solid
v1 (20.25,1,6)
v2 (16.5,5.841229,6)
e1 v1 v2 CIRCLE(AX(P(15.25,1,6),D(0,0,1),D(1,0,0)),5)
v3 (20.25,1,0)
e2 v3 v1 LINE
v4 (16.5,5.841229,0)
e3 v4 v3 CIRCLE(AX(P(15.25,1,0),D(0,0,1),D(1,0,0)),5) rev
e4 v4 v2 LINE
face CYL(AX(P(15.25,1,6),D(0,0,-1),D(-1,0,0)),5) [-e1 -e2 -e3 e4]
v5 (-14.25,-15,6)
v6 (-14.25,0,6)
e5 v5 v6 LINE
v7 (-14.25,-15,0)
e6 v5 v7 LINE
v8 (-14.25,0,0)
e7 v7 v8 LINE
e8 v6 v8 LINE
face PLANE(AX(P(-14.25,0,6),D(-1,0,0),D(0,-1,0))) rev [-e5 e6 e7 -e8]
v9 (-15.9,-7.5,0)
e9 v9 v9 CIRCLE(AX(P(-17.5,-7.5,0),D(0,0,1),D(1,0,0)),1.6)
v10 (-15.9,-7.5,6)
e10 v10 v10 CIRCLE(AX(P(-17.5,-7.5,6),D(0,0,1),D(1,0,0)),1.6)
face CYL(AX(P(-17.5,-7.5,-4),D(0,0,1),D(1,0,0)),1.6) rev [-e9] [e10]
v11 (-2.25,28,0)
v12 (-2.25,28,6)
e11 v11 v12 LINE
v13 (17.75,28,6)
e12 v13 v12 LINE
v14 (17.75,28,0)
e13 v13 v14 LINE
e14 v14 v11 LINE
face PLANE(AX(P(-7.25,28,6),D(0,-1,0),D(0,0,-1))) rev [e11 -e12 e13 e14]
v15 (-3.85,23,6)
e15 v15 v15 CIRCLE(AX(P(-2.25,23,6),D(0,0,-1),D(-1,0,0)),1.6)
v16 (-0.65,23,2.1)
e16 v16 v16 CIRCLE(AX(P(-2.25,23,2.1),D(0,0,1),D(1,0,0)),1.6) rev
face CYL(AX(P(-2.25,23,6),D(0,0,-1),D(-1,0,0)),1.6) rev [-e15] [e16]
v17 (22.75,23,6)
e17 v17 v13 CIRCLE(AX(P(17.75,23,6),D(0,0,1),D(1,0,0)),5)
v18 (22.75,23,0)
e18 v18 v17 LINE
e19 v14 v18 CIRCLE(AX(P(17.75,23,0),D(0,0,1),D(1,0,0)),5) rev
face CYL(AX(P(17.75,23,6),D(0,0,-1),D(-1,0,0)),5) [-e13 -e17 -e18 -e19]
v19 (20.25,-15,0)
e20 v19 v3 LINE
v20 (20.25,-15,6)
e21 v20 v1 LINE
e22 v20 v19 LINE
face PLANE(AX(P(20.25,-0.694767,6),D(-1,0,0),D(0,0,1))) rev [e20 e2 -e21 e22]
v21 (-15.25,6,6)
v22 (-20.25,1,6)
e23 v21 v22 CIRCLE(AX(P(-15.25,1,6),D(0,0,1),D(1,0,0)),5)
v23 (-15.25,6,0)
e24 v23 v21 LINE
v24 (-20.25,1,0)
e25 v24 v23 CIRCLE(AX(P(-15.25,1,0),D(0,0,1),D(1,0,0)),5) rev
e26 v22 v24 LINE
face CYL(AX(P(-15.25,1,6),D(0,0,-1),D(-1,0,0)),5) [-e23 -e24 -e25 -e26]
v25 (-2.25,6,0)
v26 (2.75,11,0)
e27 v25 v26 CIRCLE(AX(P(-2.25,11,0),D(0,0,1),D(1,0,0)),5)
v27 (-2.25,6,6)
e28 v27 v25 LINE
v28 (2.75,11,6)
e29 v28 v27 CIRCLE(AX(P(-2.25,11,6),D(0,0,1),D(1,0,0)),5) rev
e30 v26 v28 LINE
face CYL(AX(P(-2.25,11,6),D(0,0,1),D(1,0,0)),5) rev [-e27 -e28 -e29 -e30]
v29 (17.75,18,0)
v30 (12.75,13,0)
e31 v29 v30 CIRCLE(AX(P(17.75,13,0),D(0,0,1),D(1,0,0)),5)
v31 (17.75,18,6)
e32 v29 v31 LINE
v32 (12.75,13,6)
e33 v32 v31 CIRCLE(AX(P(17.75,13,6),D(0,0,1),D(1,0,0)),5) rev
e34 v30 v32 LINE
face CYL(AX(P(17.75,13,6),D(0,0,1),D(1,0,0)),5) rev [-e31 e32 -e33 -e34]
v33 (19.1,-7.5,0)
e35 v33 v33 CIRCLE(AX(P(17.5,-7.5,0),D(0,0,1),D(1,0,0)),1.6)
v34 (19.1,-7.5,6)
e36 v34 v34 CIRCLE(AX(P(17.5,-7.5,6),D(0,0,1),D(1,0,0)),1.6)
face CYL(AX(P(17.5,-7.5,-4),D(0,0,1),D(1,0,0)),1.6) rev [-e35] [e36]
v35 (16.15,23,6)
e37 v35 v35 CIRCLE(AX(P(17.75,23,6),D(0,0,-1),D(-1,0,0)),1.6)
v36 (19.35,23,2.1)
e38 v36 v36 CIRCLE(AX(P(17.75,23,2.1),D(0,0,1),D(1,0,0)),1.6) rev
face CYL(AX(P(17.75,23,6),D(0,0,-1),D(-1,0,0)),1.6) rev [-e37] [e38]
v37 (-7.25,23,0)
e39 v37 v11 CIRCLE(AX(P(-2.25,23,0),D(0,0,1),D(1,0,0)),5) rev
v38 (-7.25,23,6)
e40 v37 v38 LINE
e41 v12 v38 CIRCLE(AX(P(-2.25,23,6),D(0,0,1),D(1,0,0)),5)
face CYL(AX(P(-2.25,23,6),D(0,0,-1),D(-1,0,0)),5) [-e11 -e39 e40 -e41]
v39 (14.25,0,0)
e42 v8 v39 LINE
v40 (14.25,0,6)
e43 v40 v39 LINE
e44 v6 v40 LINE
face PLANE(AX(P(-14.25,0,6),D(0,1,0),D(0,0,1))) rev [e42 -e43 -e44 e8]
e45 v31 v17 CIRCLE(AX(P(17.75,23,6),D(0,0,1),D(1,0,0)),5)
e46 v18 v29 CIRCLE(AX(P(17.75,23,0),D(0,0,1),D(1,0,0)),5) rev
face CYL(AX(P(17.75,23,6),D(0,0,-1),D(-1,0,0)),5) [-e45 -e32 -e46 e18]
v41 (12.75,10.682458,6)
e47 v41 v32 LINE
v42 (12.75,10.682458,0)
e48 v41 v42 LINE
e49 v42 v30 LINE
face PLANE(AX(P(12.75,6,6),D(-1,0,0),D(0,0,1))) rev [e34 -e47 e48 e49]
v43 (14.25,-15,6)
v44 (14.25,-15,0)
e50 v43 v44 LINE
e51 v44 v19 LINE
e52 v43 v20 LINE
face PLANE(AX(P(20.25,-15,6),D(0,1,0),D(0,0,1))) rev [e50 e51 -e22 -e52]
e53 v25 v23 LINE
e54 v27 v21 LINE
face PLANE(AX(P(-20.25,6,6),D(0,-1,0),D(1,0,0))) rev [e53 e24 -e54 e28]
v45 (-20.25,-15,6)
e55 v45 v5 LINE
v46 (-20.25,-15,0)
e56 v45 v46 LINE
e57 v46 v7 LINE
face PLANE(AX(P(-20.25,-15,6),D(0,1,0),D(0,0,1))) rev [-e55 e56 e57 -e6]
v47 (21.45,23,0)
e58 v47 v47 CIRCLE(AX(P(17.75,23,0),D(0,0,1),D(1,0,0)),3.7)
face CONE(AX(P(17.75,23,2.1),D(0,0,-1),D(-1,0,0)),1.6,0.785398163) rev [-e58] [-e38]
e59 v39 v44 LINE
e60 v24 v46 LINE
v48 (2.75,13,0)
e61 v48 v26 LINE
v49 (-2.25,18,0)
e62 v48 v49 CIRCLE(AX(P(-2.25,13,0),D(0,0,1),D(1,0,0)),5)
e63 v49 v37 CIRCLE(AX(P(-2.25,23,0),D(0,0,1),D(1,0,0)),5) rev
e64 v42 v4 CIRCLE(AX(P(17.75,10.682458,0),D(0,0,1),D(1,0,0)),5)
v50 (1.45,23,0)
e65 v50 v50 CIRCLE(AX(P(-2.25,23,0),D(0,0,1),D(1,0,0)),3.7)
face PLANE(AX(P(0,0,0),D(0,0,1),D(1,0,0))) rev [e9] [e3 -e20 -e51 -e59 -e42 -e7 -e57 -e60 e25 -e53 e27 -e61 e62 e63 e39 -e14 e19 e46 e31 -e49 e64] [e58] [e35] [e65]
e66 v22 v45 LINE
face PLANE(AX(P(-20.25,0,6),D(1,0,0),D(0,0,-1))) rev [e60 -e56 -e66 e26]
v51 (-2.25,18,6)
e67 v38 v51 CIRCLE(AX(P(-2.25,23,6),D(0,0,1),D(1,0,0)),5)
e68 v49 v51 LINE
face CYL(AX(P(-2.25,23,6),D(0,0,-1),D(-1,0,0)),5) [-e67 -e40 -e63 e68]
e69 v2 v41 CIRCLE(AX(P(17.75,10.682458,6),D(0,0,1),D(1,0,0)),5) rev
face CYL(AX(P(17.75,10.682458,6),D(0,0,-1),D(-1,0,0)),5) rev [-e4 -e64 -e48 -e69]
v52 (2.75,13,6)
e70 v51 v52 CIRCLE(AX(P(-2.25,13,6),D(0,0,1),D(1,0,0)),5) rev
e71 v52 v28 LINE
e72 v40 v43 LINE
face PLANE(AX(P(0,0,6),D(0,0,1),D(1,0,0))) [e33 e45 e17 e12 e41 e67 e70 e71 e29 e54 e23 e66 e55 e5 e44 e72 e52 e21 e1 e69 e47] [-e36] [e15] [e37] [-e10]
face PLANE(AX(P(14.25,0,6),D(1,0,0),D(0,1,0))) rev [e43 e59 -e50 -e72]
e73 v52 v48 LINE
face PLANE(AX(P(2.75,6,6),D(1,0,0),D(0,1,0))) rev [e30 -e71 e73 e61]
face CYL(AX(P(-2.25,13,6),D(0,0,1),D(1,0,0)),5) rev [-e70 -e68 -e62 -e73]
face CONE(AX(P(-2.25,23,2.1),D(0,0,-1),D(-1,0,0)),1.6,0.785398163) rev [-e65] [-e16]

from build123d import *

# Parameters (mm, degrees)
BOSS_EXTRU_1_DEPTH      = 6
ESQUISSE2_R             = 1.6
ENL_V_MAT_EXTRU_1_DEPTH = 10
ESQUISSE4_R             = 1.6
ENL_V_MAT_EXTRU_2_DEPTH = 37.572701568
CHANFREIN1_SIZE         = 2.1
CONG_1_R                = 5
CONG_2_R                = 5


with BuildPart() as part:
    # Esquisse1 → Boss.-Extru.1 (new body)
    with BuildSketch(Plane.XY):
        Polygon((12.75, 18), (22.75, 18), (22.75, 28), (-7.25, 28), (-7.25, 18), (2.75, 18), (2.75, 6), (-20.25, 6), (-20.25, 0), (-20.25, -15), (-14.25, -15), (-14.25, 0), (14.25, 0), (14.25, -15), (20.25, -15), (20.25, -0.694767442), (20.25, 6), (12.75, 6), align=None)
    extrude(amount=BOSS_EXTRU_1_DEPTH)

    # Esquisse2 → Enlèv. mat.-Extru.1 (cut)
    with BuildSketch(Plane.XY.offset(6)):
        with Locations((-17.5, -7.5)):
            Circle(ESQUISSE2_R)
        with Locations((17.5, -7.5)):
            Circle(ESQUISSE2_R)
    extrude(amount=-ENL_V_MAT_EXTRU_1_DEPTH, mode=Mode.SUBTRACT)

    # Esquisse4 → Enlèv. mat.-Extru.2 (cut, through all)
    with BuildSketch(Plane(origin=(0, 0, 0), x_dir=(-1, 0, 0), z_dir=(0, 0, -1))):
        with Locations((-17.75, 23)):
            Circle(ESQUISSE4_R)
        with Locations((2.25, 23)):
            Circle(ESQUISSE4_R)
    extrude(amount=-ENL_V_MAT_EXTRU_2_DEPTH, mode=Mode.SUBTRACT)

    # Chanfrein1
    chanfrein1_edges = [part.edges().sort_by_distance(p)[0] for p in [
        (19.35, 23, 0),
        (-0.65, 23, 0),
    ]]
    chamfer(chanfrein1_edges, length=CHANFREIN1_SIZE)

    # Congé1
    cong_1_edges = [part.edges().sort_by_distance(p)[0] for p in [
        (2.75, 6, 3),
        (-20.25, 6, 3),
        (20.25, 6, 3),
        (-7.25, 28, 3),
        (-7.25, 18, 3),
        (2.75, 18, 3),
        (12.75, 18, 3),
        (22.75, 18, 3),
        (22.75, 28, 3),
    ]]
    fillet(cong_1_edges, radius=CONG_1_R - 0.0001)  # a hair under: the kernel refuses the full size

    # Congé2
    cong_2_edges = [part.edges().sort_by_distance(p)[0] for p in [
        (12.75, 6, 3),
    ]]
    fillet(cong_2_edges, radius=CONG_2_R)


solid = part.part
